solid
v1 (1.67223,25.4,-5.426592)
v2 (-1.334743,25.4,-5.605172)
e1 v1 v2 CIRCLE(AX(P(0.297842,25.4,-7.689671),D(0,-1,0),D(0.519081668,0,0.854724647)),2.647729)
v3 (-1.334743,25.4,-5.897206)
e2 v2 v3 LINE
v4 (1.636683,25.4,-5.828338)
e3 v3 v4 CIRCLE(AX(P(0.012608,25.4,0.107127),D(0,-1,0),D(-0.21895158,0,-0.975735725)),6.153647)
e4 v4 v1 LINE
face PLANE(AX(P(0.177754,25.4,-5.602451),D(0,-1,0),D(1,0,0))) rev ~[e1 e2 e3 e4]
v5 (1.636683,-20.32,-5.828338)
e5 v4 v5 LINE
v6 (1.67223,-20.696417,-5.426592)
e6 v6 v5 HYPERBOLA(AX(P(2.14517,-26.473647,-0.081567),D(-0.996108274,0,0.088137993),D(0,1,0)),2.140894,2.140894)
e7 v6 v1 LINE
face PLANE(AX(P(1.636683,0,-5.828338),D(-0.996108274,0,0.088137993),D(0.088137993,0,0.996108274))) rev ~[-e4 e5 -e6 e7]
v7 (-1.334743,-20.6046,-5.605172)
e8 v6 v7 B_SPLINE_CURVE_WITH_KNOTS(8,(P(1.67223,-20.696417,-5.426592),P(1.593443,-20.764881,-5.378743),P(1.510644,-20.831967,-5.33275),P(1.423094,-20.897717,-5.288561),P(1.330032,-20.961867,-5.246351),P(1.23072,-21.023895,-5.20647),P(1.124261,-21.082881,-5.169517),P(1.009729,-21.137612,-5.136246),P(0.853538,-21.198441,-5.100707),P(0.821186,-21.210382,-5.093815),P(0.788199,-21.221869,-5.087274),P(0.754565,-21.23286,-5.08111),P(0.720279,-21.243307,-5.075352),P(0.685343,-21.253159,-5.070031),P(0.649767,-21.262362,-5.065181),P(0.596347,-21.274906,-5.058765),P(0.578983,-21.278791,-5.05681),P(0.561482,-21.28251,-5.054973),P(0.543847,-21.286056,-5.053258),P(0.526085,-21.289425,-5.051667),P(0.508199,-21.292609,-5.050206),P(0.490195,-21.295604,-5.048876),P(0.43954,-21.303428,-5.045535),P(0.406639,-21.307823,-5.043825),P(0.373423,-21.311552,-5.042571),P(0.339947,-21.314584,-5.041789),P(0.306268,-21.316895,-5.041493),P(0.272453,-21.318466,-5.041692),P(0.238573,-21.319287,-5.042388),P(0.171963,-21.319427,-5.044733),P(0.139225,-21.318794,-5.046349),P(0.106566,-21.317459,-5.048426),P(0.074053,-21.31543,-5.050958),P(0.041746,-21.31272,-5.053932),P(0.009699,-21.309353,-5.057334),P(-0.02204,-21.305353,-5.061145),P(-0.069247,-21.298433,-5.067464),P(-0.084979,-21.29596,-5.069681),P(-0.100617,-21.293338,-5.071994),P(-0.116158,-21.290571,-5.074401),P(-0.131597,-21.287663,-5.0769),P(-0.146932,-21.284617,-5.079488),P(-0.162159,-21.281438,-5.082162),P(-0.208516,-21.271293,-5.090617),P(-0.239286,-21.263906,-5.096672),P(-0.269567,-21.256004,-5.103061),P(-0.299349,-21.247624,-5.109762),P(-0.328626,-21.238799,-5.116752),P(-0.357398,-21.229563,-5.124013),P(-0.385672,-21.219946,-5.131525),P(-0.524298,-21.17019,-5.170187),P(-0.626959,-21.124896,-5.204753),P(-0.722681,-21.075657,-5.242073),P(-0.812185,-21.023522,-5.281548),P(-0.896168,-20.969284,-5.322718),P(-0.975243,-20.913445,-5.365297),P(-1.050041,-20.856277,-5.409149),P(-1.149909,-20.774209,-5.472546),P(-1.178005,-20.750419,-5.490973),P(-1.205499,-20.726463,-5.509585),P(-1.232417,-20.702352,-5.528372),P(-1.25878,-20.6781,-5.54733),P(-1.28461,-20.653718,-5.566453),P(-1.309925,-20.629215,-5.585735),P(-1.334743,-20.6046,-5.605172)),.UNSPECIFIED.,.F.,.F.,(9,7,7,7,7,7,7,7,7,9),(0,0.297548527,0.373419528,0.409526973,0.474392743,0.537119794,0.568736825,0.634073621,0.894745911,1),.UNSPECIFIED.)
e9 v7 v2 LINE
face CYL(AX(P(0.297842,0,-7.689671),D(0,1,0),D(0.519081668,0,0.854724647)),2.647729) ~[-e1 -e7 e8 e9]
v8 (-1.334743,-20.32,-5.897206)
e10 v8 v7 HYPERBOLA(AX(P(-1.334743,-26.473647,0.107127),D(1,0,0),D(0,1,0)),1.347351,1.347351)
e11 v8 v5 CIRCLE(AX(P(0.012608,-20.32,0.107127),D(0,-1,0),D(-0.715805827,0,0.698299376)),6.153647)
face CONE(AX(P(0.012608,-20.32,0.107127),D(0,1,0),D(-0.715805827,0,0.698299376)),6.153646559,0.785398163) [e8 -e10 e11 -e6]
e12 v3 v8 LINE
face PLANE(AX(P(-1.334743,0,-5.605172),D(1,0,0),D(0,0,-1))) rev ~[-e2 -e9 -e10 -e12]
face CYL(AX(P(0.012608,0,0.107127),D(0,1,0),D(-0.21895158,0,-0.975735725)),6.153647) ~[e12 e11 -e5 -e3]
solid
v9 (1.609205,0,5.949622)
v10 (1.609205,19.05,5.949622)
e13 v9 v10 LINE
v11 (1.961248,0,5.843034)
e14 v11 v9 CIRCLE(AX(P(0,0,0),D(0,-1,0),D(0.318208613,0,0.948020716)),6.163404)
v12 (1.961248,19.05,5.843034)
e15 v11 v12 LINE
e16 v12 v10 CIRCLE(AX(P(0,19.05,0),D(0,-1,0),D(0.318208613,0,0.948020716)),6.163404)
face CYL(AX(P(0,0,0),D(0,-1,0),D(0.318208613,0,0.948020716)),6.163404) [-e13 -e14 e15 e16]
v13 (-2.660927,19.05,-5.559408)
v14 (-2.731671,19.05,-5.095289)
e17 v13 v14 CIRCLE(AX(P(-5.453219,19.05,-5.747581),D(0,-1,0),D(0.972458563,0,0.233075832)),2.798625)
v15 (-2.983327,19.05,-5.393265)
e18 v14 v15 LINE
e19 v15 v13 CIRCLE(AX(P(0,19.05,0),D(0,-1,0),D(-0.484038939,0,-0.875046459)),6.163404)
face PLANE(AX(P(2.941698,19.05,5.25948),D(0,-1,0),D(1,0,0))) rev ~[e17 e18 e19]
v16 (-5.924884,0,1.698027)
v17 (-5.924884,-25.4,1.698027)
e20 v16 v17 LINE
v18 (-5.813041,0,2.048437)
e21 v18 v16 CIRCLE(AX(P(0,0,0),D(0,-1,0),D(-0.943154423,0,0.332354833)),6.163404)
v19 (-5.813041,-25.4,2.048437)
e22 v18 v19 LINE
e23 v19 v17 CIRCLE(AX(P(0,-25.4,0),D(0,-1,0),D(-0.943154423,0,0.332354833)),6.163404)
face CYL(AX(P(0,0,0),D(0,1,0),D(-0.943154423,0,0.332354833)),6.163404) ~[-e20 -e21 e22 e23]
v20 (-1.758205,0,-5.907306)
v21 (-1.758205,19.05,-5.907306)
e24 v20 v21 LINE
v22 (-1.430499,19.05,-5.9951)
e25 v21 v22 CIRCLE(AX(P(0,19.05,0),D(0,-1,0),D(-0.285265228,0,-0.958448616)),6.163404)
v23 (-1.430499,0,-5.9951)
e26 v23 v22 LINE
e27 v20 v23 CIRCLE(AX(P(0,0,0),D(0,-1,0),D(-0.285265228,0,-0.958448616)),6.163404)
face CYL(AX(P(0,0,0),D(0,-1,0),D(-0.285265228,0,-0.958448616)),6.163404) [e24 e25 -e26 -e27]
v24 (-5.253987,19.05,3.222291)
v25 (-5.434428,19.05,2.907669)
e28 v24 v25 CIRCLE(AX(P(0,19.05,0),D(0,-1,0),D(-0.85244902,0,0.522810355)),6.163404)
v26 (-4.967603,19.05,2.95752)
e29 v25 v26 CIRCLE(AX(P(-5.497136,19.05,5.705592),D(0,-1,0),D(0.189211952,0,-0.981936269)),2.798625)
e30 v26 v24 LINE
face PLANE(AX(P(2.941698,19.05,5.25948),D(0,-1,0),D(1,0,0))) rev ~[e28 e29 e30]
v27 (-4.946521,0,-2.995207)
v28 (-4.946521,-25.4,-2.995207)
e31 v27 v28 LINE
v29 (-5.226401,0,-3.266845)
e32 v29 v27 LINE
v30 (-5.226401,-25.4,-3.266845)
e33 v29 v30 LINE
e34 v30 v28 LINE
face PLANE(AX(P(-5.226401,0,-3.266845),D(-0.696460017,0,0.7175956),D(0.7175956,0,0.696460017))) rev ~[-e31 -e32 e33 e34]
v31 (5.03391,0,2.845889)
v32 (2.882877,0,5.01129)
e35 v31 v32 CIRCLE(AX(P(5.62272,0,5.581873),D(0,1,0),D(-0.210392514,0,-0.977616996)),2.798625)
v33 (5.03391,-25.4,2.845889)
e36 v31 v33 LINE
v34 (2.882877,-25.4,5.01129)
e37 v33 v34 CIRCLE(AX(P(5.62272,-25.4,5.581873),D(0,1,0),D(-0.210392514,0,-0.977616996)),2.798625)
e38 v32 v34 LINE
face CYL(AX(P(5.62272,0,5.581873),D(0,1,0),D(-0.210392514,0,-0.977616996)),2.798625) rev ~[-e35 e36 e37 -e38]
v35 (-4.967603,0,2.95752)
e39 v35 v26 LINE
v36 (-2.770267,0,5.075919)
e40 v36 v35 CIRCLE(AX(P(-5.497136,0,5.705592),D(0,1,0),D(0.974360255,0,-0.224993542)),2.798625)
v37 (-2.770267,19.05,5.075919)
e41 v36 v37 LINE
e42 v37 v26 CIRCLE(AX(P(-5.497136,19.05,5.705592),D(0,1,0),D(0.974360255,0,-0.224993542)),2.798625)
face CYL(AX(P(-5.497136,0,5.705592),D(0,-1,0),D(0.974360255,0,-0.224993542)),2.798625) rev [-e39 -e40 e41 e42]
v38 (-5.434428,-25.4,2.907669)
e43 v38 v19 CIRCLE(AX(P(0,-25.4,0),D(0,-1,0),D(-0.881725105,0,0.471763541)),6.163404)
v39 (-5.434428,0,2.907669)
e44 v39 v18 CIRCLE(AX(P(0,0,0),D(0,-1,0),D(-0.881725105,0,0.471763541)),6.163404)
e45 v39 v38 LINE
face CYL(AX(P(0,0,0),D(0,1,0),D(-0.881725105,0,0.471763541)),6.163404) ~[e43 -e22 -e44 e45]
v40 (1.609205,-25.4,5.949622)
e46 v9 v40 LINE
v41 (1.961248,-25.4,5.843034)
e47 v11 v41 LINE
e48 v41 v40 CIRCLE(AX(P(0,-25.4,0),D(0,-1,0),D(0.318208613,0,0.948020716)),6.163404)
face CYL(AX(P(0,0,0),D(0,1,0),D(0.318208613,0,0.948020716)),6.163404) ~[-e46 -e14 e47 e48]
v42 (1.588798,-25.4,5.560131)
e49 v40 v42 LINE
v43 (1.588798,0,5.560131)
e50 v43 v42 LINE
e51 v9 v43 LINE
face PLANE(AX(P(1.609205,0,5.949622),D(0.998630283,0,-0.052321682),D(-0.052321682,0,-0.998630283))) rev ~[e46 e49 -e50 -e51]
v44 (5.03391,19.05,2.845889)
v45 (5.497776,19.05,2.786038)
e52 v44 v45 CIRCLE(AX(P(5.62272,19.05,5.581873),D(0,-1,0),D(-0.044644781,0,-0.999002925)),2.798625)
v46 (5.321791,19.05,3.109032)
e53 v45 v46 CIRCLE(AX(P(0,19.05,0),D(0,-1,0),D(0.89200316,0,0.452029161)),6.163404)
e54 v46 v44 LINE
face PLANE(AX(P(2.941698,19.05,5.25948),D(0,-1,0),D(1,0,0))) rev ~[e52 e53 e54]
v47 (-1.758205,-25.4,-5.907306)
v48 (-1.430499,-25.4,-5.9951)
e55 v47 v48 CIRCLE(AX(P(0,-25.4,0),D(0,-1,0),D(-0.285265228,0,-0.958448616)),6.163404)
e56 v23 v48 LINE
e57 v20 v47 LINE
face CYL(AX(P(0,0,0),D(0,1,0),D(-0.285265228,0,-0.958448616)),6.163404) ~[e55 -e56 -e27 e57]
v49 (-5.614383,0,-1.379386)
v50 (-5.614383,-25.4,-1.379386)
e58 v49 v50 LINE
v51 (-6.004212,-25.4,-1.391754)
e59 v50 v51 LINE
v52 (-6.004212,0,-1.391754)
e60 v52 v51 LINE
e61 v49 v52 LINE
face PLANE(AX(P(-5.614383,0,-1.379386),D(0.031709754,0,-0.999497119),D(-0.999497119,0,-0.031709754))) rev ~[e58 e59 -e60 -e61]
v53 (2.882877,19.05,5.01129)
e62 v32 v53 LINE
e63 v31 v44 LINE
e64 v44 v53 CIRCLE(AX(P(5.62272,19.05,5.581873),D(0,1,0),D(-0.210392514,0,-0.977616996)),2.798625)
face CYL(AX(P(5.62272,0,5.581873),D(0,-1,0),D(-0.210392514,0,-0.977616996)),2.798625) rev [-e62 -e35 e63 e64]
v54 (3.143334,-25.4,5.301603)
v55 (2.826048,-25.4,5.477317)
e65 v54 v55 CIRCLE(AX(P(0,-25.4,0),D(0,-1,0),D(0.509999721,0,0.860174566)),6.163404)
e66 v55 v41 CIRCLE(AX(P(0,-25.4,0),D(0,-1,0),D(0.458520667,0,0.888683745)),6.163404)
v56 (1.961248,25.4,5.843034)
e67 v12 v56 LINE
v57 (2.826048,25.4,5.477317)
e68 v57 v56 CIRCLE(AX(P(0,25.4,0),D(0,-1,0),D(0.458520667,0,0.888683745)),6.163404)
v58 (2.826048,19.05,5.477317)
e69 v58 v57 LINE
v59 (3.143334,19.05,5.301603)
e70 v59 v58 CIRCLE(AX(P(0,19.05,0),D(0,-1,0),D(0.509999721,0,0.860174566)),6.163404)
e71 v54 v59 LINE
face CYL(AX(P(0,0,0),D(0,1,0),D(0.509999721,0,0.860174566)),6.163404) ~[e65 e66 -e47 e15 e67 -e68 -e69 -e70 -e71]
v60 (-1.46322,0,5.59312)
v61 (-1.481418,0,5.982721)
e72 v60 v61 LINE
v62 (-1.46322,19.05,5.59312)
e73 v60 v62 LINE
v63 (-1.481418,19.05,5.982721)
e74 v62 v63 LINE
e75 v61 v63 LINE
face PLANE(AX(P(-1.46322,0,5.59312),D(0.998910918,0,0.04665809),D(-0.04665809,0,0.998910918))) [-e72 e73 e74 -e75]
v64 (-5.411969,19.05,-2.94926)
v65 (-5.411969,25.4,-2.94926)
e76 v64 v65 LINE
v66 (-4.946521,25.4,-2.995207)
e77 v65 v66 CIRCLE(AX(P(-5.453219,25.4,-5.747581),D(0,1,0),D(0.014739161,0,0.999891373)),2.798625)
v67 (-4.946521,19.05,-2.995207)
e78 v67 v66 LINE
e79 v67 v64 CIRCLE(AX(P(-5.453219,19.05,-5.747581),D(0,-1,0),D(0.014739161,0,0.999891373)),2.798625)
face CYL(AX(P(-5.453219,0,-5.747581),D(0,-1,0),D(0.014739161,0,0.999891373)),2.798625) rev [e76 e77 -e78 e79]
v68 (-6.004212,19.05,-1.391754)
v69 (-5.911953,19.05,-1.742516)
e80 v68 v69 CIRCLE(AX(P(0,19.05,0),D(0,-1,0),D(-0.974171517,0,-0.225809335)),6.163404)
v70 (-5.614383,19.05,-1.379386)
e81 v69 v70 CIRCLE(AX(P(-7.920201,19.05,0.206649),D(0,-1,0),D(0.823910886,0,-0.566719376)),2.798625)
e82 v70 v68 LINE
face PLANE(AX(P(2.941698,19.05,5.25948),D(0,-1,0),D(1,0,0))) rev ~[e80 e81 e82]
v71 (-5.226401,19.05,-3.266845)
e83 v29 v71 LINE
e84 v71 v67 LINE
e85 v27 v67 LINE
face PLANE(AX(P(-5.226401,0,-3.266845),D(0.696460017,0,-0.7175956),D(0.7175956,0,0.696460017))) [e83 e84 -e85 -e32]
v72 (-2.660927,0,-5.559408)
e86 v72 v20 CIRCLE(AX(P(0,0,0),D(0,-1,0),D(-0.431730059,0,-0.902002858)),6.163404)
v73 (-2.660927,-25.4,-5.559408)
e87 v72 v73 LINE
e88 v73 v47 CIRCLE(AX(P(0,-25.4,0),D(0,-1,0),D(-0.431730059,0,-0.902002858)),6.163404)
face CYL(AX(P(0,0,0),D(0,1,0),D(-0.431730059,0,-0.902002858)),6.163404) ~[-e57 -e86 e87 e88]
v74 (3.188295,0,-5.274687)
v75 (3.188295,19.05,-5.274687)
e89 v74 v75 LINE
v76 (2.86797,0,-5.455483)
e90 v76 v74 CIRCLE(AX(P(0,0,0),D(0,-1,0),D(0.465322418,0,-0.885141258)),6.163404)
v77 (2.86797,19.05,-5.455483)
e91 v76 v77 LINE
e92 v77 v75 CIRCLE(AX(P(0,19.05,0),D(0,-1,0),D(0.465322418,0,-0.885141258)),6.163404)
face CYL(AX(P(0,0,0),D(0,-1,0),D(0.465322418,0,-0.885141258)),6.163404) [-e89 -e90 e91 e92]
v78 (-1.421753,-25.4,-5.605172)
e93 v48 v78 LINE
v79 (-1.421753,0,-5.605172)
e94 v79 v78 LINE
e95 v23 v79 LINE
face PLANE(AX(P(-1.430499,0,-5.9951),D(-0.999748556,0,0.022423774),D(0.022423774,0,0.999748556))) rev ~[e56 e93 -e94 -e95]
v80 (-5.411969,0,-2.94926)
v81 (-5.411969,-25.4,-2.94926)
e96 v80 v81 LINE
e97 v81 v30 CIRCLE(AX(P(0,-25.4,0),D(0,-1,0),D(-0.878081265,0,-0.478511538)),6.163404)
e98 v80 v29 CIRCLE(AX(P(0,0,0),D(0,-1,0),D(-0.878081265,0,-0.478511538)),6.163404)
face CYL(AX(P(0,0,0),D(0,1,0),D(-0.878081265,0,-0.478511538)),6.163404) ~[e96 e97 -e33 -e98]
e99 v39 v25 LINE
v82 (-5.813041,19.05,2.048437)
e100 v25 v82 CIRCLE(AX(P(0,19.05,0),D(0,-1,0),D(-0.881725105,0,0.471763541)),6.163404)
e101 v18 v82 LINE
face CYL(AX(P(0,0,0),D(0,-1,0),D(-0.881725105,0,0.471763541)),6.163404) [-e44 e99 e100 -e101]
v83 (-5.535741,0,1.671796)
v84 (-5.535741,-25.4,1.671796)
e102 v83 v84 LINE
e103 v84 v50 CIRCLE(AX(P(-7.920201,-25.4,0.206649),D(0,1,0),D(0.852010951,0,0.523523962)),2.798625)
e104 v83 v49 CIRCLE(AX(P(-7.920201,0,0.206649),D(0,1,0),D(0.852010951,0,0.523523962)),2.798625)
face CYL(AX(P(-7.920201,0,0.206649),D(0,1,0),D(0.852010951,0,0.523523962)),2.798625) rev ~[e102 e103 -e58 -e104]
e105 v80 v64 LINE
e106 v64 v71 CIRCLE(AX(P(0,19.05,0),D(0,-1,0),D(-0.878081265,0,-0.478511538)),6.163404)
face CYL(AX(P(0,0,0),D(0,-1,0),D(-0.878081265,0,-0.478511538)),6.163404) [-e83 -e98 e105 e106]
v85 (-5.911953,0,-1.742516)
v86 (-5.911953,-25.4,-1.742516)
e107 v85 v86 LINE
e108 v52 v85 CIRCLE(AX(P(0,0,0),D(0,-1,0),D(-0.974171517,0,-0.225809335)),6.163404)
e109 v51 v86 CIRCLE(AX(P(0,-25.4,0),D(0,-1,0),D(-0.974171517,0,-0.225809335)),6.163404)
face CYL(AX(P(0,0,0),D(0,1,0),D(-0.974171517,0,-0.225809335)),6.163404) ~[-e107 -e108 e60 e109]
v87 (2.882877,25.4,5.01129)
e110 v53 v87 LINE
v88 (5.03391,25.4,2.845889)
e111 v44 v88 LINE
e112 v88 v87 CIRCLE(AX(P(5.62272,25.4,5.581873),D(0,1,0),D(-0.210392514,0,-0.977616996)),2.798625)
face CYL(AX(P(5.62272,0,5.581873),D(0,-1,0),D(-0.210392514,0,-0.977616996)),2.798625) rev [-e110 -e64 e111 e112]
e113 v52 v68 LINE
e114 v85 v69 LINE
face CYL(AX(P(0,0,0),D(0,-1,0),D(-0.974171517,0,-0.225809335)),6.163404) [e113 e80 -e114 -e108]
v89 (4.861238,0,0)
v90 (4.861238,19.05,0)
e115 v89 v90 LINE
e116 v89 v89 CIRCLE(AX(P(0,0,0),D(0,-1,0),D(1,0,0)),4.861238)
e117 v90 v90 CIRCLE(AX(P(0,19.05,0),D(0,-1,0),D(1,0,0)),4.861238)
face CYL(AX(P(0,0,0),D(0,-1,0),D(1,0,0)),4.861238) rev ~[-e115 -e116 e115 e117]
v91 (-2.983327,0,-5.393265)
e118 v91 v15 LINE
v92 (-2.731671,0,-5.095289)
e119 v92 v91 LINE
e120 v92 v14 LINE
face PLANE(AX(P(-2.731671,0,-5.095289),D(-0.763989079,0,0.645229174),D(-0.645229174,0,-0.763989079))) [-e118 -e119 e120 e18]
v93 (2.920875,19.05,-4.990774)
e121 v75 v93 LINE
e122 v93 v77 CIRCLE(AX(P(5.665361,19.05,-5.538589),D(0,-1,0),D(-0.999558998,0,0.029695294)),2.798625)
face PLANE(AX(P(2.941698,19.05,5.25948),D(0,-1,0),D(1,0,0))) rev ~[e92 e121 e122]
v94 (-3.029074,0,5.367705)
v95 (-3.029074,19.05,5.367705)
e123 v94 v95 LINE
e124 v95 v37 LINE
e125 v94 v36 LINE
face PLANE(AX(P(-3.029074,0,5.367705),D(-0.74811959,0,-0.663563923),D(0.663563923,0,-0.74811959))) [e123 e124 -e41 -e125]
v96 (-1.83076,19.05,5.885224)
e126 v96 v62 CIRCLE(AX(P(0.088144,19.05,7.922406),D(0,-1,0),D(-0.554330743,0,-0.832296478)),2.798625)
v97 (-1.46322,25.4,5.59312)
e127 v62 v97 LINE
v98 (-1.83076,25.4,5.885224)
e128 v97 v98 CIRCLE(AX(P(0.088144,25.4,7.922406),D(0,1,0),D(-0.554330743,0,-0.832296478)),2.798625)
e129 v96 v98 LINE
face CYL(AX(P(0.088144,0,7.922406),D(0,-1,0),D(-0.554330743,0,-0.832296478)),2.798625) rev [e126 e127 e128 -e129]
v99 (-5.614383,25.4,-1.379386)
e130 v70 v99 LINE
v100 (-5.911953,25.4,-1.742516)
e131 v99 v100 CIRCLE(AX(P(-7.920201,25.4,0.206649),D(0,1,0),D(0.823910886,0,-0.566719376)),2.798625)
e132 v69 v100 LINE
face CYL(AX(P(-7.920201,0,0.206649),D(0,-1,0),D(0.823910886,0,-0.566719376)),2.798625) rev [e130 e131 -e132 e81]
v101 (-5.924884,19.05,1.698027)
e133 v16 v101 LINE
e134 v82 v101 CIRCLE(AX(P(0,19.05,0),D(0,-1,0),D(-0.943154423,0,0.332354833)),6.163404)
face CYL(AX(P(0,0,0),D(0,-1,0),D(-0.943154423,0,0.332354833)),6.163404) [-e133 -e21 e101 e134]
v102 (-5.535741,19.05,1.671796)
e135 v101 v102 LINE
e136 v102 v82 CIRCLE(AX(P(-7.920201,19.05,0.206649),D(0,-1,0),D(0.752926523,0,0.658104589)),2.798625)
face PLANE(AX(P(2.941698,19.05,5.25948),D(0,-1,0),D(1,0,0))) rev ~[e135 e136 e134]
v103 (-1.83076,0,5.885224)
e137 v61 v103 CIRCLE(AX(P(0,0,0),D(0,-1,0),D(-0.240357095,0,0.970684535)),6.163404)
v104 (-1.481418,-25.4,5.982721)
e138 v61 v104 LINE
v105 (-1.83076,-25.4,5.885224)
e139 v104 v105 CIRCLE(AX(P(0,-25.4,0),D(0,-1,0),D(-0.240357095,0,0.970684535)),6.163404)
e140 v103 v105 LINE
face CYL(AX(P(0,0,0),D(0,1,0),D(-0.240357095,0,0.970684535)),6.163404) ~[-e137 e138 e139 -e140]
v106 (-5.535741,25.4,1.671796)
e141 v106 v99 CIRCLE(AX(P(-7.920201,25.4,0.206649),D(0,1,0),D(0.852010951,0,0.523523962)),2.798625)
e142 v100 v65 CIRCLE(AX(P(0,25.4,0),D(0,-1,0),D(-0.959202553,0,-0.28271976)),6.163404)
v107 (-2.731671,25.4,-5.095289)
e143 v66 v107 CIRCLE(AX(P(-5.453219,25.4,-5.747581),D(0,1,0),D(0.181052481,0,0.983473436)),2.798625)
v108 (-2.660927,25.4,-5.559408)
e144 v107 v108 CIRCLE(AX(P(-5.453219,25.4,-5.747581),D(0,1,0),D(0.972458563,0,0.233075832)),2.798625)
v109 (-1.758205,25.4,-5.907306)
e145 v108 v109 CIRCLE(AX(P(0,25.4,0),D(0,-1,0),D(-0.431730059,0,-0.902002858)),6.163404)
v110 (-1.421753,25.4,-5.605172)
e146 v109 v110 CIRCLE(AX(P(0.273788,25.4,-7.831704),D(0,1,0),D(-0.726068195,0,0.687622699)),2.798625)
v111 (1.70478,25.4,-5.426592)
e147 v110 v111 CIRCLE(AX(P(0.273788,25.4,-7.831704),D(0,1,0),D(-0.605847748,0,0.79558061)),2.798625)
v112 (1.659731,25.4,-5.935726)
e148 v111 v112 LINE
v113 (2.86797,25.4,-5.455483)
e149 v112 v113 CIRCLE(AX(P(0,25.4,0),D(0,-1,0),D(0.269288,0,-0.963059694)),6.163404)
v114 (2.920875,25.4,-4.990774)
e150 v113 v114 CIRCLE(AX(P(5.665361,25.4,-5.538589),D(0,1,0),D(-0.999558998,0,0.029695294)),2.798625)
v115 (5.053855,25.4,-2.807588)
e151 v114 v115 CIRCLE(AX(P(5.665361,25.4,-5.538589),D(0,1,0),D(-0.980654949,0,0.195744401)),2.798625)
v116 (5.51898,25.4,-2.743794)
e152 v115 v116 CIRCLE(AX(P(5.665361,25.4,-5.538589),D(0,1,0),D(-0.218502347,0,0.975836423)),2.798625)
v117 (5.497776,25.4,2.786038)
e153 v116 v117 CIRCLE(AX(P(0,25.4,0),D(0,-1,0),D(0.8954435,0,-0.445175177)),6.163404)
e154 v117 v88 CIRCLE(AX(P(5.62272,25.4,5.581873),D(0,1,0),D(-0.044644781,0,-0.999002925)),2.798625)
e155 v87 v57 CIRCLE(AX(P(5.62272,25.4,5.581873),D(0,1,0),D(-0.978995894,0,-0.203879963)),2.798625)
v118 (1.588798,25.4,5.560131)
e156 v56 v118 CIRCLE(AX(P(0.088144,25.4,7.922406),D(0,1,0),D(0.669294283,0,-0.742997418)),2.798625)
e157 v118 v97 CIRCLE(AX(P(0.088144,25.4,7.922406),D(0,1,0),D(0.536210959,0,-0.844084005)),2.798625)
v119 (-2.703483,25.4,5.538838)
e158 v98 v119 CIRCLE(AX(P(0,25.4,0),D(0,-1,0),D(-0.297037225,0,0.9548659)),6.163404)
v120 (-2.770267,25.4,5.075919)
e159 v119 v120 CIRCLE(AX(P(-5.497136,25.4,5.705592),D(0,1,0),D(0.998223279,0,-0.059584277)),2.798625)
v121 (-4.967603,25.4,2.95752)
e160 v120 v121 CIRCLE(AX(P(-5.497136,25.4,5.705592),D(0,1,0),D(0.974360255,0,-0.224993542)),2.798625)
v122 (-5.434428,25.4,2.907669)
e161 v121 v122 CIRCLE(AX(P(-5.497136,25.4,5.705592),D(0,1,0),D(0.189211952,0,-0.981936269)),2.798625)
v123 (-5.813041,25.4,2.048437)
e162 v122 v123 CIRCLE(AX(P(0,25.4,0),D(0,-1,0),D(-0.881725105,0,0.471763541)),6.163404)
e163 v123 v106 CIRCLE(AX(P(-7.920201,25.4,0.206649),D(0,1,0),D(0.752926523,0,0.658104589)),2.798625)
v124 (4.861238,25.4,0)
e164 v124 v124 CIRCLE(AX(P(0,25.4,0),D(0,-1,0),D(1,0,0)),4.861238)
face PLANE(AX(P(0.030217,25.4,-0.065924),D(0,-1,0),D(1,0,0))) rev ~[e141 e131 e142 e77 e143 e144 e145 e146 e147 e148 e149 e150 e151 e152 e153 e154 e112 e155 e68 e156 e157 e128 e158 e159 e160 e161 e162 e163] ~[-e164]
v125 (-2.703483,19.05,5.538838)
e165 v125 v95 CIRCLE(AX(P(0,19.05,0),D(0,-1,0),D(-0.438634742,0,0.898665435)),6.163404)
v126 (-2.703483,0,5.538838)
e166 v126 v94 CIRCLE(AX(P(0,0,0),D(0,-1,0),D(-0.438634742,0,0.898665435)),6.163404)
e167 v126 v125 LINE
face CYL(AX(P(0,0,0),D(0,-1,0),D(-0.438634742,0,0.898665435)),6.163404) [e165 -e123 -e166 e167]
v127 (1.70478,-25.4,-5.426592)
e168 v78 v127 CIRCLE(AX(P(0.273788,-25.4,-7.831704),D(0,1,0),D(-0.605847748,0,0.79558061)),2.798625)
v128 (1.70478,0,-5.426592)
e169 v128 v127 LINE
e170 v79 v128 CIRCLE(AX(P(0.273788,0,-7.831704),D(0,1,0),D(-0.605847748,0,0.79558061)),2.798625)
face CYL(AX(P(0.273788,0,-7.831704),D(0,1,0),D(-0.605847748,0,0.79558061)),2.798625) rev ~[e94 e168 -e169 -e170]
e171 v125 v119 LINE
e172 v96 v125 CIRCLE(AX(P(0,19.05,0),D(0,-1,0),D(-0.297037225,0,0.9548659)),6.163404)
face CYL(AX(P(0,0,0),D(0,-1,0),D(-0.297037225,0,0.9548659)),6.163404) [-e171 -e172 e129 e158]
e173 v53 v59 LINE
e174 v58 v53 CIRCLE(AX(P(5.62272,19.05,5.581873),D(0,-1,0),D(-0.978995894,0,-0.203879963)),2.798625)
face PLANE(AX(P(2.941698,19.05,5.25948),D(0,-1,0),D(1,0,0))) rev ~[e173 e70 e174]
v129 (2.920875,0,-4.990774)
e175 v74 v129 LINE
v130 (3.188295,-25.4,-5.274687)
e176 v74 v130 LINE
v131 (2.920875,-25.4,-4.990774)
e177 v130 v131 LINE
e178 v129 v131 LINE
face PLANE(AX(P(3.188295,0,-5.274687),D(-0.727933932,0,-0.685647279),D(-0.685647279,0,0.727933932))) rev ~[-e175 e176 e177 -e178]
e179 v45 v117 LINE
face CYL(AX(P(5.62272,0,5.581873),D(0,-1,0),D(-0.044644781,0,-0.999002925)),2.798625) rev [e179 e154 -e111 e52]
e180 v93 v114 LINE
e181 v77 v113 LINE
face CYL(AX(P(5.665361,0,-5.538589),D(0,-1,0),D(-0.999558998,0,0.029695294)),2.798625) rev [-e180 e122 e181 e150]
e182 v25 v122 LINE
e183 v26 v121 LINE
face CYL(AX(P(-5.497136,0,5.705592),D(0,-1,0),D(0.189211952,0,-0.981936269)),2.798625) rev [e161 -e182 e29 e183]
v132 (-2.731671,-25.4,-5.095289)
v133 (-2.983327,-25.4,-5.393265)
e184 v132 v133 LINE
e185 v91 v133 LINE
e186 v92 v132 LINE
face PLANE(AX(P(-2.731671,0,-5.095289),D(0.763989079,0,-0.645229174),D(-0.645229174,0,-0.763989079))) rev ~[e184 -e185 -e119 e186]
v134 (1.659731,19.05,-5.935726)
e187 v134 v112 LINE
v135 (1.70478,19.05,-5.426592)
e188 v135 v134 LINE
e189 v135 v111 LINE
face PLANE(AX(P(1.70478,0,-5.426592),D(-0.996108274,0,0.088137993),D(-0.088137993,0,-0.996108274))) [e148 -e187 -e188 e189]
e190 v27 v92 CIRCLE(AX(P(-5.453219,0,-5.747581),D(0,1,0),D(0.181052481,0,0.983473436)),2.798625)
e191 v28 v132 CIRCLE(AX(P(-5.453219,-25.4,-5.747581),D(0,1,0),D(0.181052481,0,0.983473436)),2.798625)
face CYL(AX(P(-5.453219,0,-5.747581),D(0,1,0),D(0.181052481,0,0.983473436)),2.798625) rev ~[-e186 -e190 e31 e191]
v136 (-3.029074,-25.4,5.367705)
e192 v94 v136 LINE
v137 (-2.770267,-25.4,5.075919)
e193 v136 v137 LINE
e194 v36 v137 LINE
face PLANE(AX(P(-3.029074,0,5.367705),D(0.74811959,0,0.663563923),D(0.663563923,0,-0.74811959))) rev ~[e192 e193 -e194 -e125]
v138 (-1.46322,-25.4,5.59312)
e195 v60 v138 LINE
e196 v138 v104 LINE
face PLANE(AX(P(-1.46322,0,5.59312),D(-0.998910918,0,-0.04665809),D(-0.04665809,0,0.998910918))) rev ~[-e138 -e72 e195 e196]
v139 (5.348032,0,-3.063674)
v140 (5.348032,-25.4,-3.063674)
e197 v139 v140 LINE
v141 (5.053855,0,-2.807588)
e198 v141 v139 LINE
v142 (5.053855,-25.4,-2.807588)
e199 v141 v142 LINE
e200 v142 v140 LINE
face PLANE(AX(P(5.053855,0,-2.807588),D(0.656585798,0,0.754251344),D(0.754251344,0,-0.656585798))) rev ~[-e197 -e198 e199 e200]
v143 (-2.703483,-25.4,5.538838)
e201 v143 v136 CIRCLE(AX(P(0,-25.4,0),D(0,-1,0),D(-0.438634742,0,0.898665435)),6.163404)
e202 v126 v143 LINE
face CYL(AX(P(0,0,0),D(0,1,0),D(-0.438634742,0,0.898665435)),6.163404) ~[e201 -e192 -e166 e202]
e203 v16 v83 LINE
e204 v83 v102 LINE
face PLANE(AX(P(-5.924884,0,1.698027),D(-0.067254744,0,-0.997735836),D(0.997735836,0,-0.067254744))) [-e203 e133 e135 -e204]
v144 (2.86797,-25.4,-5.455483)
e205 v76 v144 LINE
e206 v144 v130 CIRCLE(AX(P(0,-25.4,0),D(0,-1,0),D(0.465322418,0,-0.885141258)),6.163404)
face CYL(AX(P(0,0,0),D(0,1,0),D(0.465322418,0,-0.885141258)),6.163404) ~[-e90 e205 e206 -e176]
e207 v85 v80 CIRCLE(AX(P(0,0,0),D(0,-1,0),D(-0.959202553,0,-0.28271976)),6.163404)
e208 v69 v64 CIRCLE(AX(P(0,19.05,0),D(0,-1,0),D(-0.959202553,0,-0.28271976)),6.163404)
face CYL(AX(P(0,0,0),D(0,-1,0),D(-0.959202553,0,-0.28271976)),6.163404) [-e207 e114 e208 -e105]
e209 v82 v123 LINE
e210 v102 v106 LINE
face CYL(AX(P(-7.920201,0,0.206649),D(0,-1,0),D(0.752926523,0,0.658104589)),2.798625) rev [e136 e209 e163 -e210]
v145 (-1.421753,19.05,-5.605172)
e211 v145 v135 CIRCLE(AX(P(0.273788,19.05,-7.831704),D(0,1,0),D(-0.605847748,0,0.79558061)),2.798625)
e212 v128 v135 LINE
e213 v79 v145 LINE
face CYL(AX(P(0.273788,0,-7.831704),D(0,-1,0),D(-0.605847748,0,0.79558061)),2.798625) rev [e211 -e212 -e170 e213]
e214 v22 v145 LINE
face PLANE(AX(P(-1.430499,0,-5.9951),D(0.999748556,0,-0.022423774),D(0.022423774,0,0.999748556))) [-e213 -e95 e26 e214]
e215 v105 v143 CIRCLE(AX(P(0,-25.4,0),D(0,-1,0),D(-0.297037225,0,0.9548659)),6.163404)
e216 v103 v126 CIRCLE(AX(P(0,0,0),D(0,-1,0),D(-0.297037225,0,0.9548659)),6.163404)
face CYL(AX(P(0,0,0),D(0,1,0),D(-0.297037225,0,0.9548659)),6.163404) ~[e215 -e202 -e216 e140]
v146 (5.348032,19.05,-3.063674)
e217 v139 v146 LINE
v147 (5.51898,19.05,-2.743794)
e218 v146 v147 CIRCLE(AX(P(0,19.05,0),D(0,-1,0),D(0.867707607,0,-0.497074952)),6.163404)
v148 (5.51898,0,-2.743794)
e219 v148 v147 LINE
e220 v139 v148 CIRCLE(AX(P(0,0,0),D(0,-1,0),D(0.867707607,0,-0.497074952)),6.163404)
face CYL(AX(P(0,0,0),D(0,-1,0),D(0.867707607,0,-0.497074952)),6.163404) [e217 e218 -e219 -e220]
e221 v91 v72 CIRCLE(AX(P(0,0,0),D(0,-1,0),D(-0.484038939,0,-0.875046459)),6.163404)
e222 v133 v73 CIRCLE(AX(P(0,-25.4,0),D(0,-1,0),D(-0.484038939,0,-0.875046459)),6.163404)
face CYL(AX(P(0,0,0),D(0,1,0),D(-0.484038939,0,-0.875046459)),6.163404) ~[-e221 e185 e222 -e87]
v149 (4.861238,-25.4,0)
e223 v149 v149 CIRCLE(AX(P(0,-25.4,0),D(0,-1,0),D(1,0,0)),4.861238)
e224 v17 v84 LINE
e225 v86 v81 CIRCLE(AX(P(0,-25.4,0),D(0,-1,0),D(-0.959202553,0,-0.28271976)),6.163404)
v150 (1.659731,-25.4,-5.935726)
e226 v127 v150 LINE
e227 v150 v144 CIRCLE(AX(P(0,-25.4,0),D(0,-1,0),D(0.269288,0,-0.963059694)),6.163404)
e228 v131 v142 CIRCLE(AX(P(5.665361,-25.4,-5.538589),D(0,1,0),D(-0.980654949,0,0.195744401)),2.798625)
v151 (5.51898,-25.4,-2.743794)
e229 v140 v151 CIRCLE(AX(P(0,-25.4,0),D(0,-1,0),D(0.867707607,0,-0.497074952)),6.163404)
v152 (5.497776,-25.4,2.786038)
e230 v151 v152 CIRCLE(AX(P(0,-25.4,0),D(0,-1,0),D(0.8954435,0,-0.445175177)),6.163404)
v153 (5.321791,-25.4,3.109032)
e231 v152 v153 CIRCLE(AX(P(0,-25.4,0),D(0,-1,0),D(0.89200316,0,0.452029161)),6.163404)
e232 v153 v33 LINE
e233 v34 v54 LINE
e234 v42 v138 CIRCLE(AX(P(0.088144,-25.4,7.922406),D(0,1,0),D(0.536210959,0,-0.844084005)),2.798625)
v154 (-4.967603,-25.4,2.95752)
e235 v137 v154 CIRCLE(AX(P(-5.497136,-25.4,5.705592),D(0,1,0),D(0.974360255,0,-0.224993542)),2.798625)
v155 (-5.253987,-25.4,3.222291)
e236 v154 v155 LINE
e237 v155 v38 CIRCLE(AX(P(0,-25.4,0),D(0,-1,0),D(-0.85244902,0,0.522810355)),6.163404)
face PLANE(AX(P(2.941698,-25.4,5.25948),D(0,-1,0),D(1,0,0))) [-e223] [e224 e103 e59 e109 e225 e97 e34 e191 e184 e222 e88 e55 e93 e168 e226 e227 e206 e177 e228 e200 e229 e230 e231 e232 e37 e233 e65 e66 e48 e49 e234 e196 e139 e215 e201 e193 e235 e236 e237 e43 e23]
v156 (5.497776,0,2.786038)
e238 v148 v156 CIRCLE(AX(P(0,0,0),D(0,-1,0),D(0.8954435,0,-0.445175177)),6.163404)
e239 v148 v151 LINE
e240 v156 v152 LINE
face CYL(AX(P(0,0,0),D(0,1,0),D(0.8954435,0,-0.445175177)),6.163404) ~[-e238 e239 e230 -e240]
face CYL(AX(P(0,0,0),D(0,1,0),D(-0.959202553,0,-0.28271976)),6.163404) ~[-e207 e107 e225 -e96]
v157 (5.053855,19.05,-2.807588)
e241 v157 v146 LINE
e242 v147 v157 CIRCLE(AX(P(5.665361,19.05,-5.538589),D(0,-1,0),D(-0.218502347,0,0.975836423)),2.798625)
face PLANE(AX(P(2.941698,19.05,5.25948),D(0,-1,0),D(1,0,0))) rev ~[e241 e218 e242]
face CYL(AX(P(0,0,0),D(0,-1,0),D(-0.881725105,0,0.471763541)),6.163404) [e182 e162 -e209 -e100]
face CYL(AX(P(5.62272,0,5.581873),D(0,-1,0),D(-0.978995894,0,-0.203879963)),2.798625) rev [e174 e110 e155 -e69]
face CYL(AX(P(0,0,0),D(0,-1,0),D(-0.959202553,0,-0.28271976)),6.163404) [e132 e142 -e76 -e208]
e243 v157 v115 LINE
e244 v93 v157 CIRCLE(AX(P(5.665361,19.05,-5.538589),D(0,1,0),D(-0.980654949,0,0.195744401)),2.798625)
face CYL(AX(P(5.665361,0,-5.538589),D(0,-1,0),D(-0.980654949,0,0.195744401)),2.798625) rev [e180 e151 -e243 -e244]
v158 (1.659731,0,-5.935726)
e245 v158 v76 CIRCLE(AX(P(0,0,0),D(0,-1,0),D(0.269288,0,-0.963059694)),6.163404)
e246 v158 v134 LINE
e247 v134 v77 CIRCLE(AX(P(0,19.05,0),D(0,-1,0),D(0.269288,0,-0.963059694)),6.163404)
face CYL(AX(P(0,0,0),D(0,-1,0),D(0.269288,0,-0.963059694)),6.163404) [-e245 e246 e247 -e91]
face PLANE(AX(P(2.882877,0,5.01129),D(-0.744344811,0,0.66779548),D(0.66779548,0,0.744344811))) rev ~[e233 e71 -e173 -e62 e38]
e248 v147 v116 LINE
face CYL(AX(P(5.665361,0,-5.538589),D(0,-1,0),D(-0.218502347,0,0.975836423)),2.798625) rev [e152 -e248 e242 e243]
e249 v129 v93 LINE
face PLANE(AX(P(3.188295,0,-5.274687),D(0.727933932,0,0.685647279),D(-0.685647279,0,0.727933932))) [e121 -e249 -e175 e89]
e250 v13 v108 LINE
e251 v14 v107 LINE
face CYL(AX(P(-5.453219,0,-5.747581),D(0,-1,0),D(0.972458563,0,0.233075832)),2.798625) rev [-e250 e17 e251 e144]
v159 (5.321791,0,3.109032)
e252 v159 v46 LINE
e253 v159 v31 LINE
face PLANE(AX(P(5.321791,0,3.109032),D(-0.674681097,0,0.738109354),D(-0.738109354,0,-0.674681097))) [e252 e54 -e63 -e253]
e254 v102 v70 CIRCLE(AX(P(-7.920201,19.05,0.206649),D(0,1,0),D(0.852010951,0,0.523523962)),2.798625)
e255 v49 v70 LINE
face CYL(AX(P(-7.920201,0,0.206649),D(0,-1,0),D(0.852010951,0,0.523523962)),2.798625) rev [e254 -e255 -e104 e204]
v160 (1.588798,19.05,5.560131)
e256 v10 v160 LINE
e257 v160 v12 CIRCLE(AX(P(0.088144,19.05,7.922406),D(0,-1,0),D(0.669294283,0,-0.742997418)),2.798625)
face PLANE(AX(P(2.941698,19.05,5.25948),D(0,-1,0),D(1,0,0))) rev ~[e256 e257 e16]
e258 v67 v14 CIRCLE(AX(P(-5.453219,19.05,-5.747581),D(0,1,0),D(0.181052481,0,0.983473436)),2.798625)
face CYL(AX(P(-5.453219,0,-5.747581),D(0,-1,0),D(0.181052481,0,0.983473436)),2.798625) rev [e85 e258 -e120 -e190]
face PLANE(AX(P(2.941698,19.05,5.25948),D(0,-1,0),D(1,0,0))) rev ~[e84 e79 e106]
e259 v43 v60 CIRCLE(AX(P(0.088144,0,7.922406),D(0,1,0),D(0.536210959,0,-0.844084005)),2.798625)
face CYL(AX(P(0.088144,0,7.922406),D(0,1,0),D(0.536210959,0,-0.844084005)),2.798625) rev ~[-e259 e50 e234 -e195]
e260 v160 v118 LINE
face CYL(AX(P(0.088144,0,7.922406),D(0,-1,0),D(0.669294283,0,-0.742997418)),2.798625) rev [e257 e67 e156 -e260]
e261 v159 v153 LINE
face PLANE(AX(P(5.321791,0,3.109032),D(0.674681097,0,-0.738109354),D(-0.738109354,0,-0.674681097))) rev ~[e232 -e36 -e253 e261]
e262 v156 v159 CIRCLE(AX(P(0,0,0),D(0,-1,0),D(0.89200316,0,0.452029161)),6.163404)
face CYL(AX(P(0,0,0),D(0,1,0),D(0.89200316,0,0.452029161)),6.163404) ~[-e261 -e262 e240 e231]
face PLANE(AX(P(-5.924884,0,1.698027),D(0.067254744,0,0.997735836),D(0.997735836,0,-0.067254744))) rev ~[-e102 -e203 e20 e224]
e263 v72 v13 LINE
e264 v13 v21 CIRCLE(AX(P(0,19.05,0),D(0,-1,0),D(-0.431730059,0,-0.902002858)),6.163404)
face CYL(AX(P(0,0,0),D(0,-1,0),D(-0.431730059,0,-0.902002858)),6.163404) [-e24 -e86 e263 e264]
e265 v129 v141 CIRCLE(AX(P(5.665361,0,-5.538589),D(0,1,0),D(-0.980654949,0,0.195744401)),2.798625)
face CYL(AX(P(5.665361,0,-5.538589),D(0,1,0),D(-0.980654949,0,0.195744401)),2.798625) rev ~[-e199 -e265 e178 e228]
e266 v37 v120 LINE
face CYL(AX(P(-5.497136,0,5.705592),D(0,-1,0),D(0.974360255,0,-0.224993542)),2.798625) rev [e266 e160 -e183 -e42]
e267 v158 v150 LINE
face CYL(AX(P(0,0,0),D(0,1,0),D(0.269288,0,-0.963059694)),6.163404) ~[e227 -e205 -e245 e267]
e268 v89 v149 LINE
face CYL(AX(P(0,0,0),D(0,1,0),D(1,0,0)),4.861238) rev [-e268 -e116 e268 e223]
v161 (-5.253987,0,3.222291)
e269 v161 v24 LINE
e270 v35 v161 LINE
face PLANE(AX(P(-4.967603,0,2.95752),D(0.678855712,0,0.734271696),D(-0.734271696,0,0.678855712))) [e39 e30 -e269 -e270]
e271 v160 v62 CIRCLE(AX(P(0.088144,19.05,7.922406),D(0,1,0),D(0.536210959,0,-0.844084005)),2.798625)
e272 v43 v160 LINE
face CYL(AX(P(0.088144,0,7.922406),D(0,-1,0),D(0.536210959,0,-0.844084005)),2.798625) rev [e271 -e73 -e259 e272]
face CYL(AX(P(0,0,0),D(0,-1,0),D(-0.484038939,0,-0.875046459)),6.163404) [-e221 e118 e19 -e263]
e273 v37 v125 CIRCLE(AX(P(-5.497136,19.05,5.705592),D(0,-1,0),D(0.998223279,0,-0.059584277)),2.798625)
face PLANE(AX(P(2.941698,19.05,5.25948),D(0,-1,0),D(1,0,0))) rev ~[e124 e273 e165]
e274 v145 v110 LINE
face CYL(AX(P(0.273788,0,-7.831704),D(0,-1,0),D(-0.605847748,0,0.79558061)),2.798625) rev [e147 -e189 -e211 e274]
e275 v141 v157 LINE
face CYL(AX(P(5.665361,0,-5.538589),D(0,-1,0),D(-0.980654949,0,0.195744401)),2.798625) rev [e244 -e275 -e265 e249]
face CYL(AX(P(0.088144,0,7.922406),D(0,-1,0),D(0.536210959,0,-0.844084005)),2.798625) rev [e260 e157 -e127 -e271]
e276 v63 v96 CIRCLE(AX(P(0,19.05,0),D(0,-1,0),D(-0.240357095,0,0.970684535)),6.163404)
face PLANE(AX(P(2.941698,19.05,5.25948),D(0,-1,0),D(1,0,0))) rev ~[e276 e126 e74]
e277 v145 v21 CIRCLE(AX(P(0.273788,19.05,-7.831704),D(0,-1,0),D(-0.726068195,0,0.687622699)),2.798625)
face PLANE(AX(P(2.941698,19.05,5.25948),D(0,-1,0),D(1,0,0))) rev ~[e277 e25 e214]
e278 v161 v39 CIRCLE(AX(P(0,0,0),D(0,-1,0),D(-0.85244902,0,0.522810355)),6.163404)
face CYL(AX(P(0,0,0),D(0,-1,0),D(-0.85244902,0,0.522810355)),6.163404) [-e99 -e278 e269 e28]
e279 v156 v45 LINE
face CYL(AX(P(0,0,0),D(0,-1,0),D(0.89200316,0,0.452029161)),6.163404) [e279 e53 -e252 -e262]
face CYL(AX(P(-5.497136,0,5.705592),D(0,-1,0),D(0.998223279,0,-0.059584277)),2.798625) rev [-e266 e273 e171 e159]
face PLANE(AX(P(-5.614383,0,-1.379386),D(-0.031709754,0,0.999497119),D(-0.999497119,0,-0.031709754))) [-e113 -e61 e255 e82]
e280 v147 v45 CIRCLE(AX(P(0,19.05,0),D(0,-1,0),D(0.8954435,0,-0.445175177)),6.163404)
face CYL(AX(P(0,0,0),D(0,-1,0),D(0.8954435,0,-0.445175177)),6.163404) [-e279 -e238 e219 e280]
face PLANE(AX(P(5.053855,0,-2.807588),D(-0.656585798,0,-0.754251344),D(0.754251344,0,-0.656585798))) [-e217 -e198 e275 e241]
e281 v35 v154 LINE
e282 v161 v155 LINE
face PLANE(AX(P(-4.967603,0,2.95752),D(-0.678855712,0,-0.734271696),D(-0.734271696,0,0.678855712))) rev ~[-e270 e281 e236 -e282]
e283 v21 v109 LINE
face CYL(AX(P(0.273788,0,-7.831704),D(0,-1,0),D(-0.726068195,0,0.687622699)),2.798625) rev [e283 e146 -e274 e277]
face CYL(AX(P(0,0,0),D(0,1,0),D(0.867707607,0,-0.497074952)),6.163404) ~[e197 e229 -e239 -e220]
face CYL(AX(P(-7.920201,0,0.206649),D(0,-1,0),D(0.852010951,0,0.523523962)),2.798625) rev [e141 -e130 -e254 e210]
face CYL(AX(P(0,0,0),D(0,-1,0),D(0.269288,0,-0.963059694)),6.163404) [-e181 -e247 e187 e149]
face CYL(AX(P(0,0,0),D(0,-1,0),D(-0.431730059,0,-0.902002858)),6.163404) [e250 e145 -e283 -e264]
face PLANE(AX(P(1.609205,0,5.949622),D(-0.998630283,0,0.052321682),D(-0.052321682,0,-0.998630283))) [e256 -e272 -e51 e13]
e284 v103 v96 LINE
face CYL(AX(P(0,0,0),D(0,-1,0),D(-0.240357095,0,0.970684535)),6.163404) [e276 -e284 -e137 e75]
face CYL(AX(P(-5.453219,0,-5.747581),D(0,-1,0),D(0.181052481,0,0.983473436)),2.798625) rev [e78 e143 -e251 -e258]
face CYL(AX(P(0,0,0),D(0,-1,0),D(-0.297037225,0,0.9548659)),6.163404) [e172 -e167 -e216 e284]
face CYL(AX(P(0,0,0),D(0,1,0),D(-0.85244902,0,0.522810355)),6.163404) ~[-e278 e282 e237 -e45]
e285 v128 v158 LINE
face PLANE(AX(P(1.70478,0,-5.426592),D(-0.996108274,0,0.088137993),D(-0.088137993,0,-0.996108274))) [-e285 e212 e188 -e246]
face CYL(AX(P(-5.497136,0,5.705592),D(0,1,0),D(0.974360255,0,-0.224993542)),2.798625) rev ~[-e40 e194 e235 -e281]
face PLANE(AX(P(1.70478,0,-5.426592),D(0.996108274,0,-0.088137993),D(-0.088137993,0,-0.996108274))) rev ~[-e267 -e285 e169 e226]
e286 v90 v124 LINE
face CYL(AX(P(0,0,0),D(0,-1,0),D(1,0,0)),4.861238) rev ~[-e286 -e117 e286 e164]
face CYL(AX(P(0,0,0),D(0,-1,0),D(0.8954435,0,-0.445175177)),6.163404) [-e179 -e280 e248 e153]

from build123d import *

# Parameters (mm, degrees)
F0_R          = 4.8612376023
F1_DEPTH      = 25.4
F1_DEPTH_BACK = 25.4
F2_DEPTH      = 19.05
F2_DEPTH_BACK = 25.4
F3_DEPTH      = 25.4
F3_DEPTH_BACK = 25.4
F4_T2_ANGLE   = 271.2368100282


# Not quite as in the source:
# - a fillet or chamfer that OpenCascade refuses, or shapes differently, is made with other operations: its cross-section is extruded or revolved along the edge and cut away or added


with BuildPart() as f1:
    # F0 (on Front) → F1 (new body, two sides)
    with BuildSketch(Plane.XZ) as f1_sk:
        with BuildLine():
            ThreePointArc((-5.6143828163, -1.3793864731), (-5.7555397167, -1.5672020545), (-5.9119525631, -1.7425160147))
            ThreePointArc((-5.9119525631, -1.7425160147), (-5.6940196105, -2.3591705842), (-5.4119693183, -2.9492597831))
            ThreePointArc((-5.4119693183, -2.9492597831), (-5.1782834381, -2.962493255), (-4.9465206336, -2.9952074382))
            ThreePointArc((-4.9465206336, -2.9952074382), (-3.5276076708, -3.7167374387), (-2.7316714584, -5.0952892453))
            ThreePointArc((-2.7316714584, -5.0952892453), (-2.6865496833, -5.3258624193), (-2.6609266437, -5.5594077533))
            ThreePointArc((-2.6609266437, -5.5594077533), (-2.2164022319, -5.751096097), (-1.7582047643, -5.907305746))
            ThreePointArc((-1.7582047643, -5.907305746), (-1.5960910736, -5.7494322847), (-1.4217527636, -5.6051719916))
            ThreePointArc((-1.4217527636, -5.6051719916), (0.114197137, -5.0376327164), (1.7047800347, -5.4265915467))
            Line((1.7047800347, -5.4265915467), (1.6597306544, -5.935725678))
            ThreePointArc((1.6597306544, -5.935725678), (2.2765492286, -5.7275534725), (2.8679699144, -5.4554829062))
            ThreePointArc((2.8679699144, -5.4554829062), (2.8846977078, -5.22202114), (2.9208752645, -4.990773654))
            ThreePointArc((2.9208752645, -4.990773654), (3.6635506236, -3.582813126), (5.0538549065, -2.807588295))
            ThreePointArc((5.0538549065, -2.807588295), (5.2850772748, -2.7659208069), (5.5189797809, -2.7437943341))
            ThreePointArc((5.5189797809, -2.7437943341), (6.1633583889, 0.023633466), (5.4977755768, 2.7860382045))
            ThreePointArc((5.4977755768, 2.7860382045), (5.2645901724, 2.8062565756), (5.0339097574, 2.8458894094))
            ThreePointArc((5.0339097574, 2.8458894094), (3.6372167606, 3.6095439191), (2.8828768034, 5.0112895332))
            ThreePointArc((2.8828768034, 5.0112895332), (2.8446729274, 5.2431093491), (2.8260479734, 5.4773166809))
            ThreePointArc((2.8260479734, 5.4773166809), (2.4006224975, 5.6766677545), (1.961248138, 5.8430343924))
            ThreePointArc((1.961248138, 5.8430343924), (1.7809432193, 5.6937884489), (1.588797766, 5.5601309009))
            ThreePointArc((1.588797766, 5.5601309009), (0.0578959269, 5.1239439038), (-1.4632199599, 5.5931197733))
            ThreePointArc((-1.4632199599, 5.5931197733), (-1.6531261487, 5.7314512688), (-1.830760335, 5.88522402))
            ThreePointArc((-1.830760335, 5.88522402), (-2.2737274404, 5.728674253), (-2.7034829894, 5.5388378651))
            ThreePointArc((-2.7034829894, 5.5388378651), (-2.7271874135, 5.3059810086), (-2.7702666546, 5.07591929))
            ThreePointArc((-2.7702666546, 5.07591929), (-3.5547294118, 3.6908063992), (-4.9676026515, 2.9575201346))
            ThreePointArc((-4.9676026515, 2.9575201346), (-5.1999680345, 2.9227884204), (-5.4344277772, 2.9076691533))
            ThreePointArc((-5.4344277772, 2.9076691533), (-5.6401206566, 2.4852734556), (-5.8130414583, 2.0484370076))
            ThreePointArc((-5.8130414583, 2.0484370076), (-5.6665094698, 1.8659196339), (-5.5357412598, 1.6717962436))
            ThreePointArc((-5.5357412598, 1.6717962436), (-5.122504455, 0.1345406108), (-5.6143828163, -1.3793864731))
        make_face()
        Circle(F0_R, mode=Mode.SUBTRACT)
    extrude(amount=-F1_DEPTH)
    extrude(f1_sk.sketch, amount=F1_DEPTH_BACK)

    # F0 (on Front) → F2 (join, two sides)
    with BuildSketch(Plane.XZ) as f2_sk:
        with BuildLine():
            ThreePointArc((3.1433341705, 5.3016031031), (2.9859838597, 5.3917942802), (2.8260479734, 5.4773166809))
            ThreePointArc((2.8260479734, 5.4773166809), (2.8446729274, 5.2431093491), (2.8828768034, 5.0112895332))
            Line((2.8828768034, 5.0112895332), (3.1433341705, 5.3016031031))
        make_face()
        with BuildLine():
            Line((1.6092045641, 5.9496223276), (1.588797766, 5.5601309009))
            ThreePointArc((1.588797766, 5.5601309009), (1.7809432193, 5.6937884489), (1.961248138, 5.8430343924))
            ThreePointArc((1.961248138, 5.8430343924), (1.7860216604, 5.8989551447), (1.6092045641, 5.9496223276))
        make_face()
        with BuildLine():
            ThreePointArc((-1.4814178118, 5.9827206551), (-1.6568063911, 5.9365425757), (-1.830760335, 5.88522402))
            ThreePointArc((-1.830760335, 5.88522402), (-1.6531261487, 5.7314512688), (-1.4632199599, 5.5931197733))
            Line((-1.4632199599, 5.5931197733), (-1.4814178118, 5.9827206551))
        make_face()
        with BuildLine():
            Line((-3.0290736059, 5.3677051205), (-2.7702666546, 5.07591929))
            ThreePointArc((-2.7702666546, 5.07591929), (-2.7271874135, 5.3059810086), (-2.7034829894, 5.5388378651))
            ThreePointArc((-2.7034829894, 5.5388378651), (-2.8675552102, 5.4557008978), (-3.0290736059, 5.3677051205))
        make_face()
        with BuildLine():
            ThreePointArc((-5.253987448, 3.2222912758), (-5.3465224003, 3.0663077787), (-5.4344277772, 2.9076691533))
            ThreePointArc((-5.4344277772, 2.9076691533), (-5.1999680345, 2.9227884204), (-4.9676026515, 2.9575201346))
            Line((-4.9676026515, 2.9575201346), (-5.253987448, 3.2222912758))
        make_face()
        with BuildLine():
            Line((-5.9248838296, 1.698027319), (-5.5357412598, 1.6717962436))
            ThreePointArc((-5.5357412598, 1.6717962436), (-5.6665094698, 1.8659196339), (-5.8130414583, 2.0484370076))
            ThreePointArc((-5.8130414583, 2.0484370076), (-5.8715772373, 1.8740666788), (-5.9248838296, 1.698027319))
        make_face()
        with BuildLine():
            ThreePointArc((-6.0042123315, -1.3917540905), (-5.9606631284, -1.5678138408), (-5.9119525631, -1.7425160147))
            ThreePointArc((-5.9119525631, -1.7425160147), (-5.7555397167, -1.5672020545), (-5.6143828163, -1.3793864731))
            Line((-5.6143828163, -1.3793864731), (-6.0042123315, -1.3917540905))
        make_face()
        with BuildLine():
            ThreePointArc((5.0339097574, 2.8458894094), (5.2645901724, 2.8062565756), (5.4977755768, 2.7860382045))
            ThreePointArc((5.4977755768, 2.7860382045), (5.4121934892, 2.9488483863), (5.321791339, 3.1090323437))
            Line((5.321791339, 3.1090323437), (5.0339097574, 2.8458894094))
        make_face()
        with BuildLine():
            ThreePointArc((5.5189797809, -2.7437943341), (5.2850772748, -2.7659208069), (5.0538549065, -2.807588295))
            Line((5.0538549065, -2.807588295), (5.3480322785, -3.0636735985))
            ThreePointArc((5.3480322785, -3.0636735985), (5.4358594961, -2.9049916883), (5.5189797809, -2.7437943341))
        make_face()
        with BuildLine():
            ThreePointArc((2.9208752645, -4.990773654), (2.8846977078, -5.22202114), (2.8679699144, -5.4554829062))
            ThreePointArc((2.8679699144, -5.4554829062), (3.0294816207, -5.3674748514), (3.1882952913, -5.27468656))
            Line((3.1882952913, -5.27468656), (2.9208752645, -4.990773654))
        make_face()
        with BuildLine():
            ThreePointArc((-5.6143828163, -1.3793864731), (-5.7555397167, -1.5672020545), (-5.9119525631, -1.7425160147))
            ThreePointArc((-5.9119525631, -1.7425160147), (-5.6940196105, -2.3591705842), (-5.4119693183, -2.9492597831))
            ThreePointArc((-5.4119693183, -2.9492597831), (-5.1782834381, -2.962493255), (-4.9465206336, -2.9952074382))
            ThreePointArc((-4.9465206336, -2.9952074382), (-3.5276076708, -3.7167374387), (-2.7316714584, -5.0952892453))
            ThreePointArc((-2.7316714584, -5.0952892453), (-2.6865496833, -5.3258624193), (-2.6609266437, -5.5594077533))
            ThreePointArc((-2.6609266437, -5.5594077533), (-2.2164022319, -5.751096097), (-1.7582047643, -5.907305746))
            ThreePointArc((-1.7582047643, -5.907305746), (-1.5960910736, -5.7494322847), (-1.4217527636, -5.6051719916))
            ThreePointArc((-1.4217527636, -5.6051719916), (0.114197137, -5.0376327164), (1.7047800347, -5.4265915467))
            Line((1.7047800347, -5.4265915467), (1.6597306544, -5.935725678))
            ThreePointArc((1.6597306544, -5.935725678), (2.2765492286, -5.7275534725), (2.8679699144, -5.4554829062))
            ThreePointArc((2.8679699144, -5.4554829062), (2.8846977078, -5.22202114), (2.9208752645, -4.990773654))
            ThreePointArc((2.9208752645, -4.990773654), (3.6635506236, -3.582813126), (5.0538549065, -2.807588295))
            ThreePointArc((5.0538549065, -2.807588295), (5.2850772748, -2.7659208069), (5.5189797809, -2.7437943341))
            ThreePointArc((5.5189797809, -2.7437943341), (6.1633583889, 0.023633466), (5.4977755768, 2.7860382045))
            ThreePointArc((5.4977755768, 2.7860382045), (5.2645901724, 2.8062565756), (5.0339097574, 2.8458894094))
            ThreePointArc((5.0339097574, 2.8458894094), (3.6372167606, 3.6095439191), (2.8828768034, 5.0112895332))
            ThreePointArc((2.8828768034, 5.0112895332), (2.8446729274, 5.2431093491), (2.8260479734, 5.4773166809))
            ThreePointArc((2.8260479734, 5.4773166809), (2.4006224975, 5.6766677545), (1.961248138, 5.8430343924))
            ThreePointArc((1.961248138, 5.8430343924), (1.7809432193, 5.6937884489), (1.588797766, 5.5601309009))
            ThreePointArc((1.588797766, 5.5601309009), (0.0578959269, 5.1239439038), (-1.4632199599, 5.5931197733))
            ThreePointArc((-1.4632199599, 5.5931197733), (-1.6531261487, 5.7314512688), (-1.830760335, 5.88522402))
            ThreePointArc((-1.830760335, 5.88522402), (-2.2737274404, 5.728674253), (-2.7034829894, 5.5388378651))
            ThreePointArc((-2.7034829894, 5.5388378651), (-2.7271874135, 5.3059810086), (-2.7702666546, 5.07591929))
            ThreePointArc((-2.7702666546, 5.07591929), (-3.5547294118, 3.6908063992), (-4.9676026515, 2.9575201346))
            ThreePointArc((-4.9676026515, 2.9575201346), (-5.1999680345, 2.9227884204), (-5.4344277772, 2.9076691533))
            ThreePointArc((-5.4344277772, 2.9076691533), (-5.6401206566, 2.4852734556), (-5.8130414583, 2.0484370076))
            ThreePointArc((-5.8130414583, 2.0484370076), (-5.6665094698, 1.8659196339), (-5.5357412598, 1.6717962436))
            ThreePointArc((-5.5357412598, 1.6717962436), (-5.122504455, 0.1345406108), (-5.6143828163, -1.3793864731))
        make_face()
        Circle(F0_R, mode=Mode.SUBTRACT)
        with BuildLine():
            ThreePointArc((-1.4217527636, -5.6051719916), (-1.5960910736, -5.7494322847), (-1.7582047643, -5.907305746))
            ThreePointArc((-1.7582047643, -5.907305746), (-1.5949558747, -5.9534578967), (-1.4304986106, -5.9950995734))
            Line((-1.4304986106, -5.9950995734), (-1.4217527636, -5.6051719916))
        make_face()
        with BuildLine():
            ThreePointArc((-2.6609266437, -5.5594077533), (-2.6865496833, -5.3258624193), (-2.7316714584, -5.0952892453))
            Line((-2.7316714584, -5.0952892453), (-2.9833273874, -5.3932645837))
            ThreePointArc((-2.9833273874, -5.3932645837), (-2.8233493903, -5.4787081863), (-2.6609266437, -5.5594077533))
        make_face()
        with BuildLine():
            ThreePointArc((-4.9465206336, -2.9952074382), (-5.1782834381, -2.962493255), (-5.4119693183, -2.9492597831))
            ThreePointArc((-5.4119693183, -2.9492597831), (-5.321554992, -3.1094368681), (-5.2264013251, -3.2668447099))
            Line((-5.2264013251, -3.2668447099), (-4.9465206336, -2.9952074382))
        make_face()
    extrude(amount=-F2_DEPTH)
    extrude(f2_sk.sketch, amount=F2_DEPTH_BACK)


with BuildPart() as f3:
    # F0 (on Front) → F3 (new body, two sides)
    with BuildSketch(Plane.XZ) as f3_sk:
        with BuildLine():
            Line((-1.3347425842, -5.6051719916), (-1.3347425842, -5.8972059093))
            ThreePointArc((-1.3347425842, -5.8972059093), (0.1551903565, -6.0448676148), (1.63668259, -5.8283383814))
            Line((1.63668259, -5.8283383814), (1.6722300908, -5.4265915467))
            ThreePointArc((1.6722300908, -5.4265915467), (0.1408736066, -5.0465987547), (-1.3347425842, -5.6051719916))
        make_face()
    extrude(amount=-F3_DEPTH)
    extrude(f3_sk.sketch, amount=F3_DEPTH_BACK)

    # F4: chamfer of 5.08 on 1 edges, made by hand

    # F4_s1 → F4_t2 (revolve, cut)
    with BuildSketch(Plane(origin=(0.0596949871, 0, 0.0611915478), x_dir=(0, 1, 0), z_dir=(0.6982993759, 0, 0.7158058268))):
        Polygon((-20.32, 6.219428276), (-25.4, 1.139428276), (-25.4, 6.219428276), align=None)
    revolve(axis=Axis((0.0126080508, -25.4, 0.1071268796), (0, -1, 0)), revolution_arc=F4_T2_ANGLE, mode=Mode.SUBTRACT)


solid = Compound([f1.part, f3.part])
